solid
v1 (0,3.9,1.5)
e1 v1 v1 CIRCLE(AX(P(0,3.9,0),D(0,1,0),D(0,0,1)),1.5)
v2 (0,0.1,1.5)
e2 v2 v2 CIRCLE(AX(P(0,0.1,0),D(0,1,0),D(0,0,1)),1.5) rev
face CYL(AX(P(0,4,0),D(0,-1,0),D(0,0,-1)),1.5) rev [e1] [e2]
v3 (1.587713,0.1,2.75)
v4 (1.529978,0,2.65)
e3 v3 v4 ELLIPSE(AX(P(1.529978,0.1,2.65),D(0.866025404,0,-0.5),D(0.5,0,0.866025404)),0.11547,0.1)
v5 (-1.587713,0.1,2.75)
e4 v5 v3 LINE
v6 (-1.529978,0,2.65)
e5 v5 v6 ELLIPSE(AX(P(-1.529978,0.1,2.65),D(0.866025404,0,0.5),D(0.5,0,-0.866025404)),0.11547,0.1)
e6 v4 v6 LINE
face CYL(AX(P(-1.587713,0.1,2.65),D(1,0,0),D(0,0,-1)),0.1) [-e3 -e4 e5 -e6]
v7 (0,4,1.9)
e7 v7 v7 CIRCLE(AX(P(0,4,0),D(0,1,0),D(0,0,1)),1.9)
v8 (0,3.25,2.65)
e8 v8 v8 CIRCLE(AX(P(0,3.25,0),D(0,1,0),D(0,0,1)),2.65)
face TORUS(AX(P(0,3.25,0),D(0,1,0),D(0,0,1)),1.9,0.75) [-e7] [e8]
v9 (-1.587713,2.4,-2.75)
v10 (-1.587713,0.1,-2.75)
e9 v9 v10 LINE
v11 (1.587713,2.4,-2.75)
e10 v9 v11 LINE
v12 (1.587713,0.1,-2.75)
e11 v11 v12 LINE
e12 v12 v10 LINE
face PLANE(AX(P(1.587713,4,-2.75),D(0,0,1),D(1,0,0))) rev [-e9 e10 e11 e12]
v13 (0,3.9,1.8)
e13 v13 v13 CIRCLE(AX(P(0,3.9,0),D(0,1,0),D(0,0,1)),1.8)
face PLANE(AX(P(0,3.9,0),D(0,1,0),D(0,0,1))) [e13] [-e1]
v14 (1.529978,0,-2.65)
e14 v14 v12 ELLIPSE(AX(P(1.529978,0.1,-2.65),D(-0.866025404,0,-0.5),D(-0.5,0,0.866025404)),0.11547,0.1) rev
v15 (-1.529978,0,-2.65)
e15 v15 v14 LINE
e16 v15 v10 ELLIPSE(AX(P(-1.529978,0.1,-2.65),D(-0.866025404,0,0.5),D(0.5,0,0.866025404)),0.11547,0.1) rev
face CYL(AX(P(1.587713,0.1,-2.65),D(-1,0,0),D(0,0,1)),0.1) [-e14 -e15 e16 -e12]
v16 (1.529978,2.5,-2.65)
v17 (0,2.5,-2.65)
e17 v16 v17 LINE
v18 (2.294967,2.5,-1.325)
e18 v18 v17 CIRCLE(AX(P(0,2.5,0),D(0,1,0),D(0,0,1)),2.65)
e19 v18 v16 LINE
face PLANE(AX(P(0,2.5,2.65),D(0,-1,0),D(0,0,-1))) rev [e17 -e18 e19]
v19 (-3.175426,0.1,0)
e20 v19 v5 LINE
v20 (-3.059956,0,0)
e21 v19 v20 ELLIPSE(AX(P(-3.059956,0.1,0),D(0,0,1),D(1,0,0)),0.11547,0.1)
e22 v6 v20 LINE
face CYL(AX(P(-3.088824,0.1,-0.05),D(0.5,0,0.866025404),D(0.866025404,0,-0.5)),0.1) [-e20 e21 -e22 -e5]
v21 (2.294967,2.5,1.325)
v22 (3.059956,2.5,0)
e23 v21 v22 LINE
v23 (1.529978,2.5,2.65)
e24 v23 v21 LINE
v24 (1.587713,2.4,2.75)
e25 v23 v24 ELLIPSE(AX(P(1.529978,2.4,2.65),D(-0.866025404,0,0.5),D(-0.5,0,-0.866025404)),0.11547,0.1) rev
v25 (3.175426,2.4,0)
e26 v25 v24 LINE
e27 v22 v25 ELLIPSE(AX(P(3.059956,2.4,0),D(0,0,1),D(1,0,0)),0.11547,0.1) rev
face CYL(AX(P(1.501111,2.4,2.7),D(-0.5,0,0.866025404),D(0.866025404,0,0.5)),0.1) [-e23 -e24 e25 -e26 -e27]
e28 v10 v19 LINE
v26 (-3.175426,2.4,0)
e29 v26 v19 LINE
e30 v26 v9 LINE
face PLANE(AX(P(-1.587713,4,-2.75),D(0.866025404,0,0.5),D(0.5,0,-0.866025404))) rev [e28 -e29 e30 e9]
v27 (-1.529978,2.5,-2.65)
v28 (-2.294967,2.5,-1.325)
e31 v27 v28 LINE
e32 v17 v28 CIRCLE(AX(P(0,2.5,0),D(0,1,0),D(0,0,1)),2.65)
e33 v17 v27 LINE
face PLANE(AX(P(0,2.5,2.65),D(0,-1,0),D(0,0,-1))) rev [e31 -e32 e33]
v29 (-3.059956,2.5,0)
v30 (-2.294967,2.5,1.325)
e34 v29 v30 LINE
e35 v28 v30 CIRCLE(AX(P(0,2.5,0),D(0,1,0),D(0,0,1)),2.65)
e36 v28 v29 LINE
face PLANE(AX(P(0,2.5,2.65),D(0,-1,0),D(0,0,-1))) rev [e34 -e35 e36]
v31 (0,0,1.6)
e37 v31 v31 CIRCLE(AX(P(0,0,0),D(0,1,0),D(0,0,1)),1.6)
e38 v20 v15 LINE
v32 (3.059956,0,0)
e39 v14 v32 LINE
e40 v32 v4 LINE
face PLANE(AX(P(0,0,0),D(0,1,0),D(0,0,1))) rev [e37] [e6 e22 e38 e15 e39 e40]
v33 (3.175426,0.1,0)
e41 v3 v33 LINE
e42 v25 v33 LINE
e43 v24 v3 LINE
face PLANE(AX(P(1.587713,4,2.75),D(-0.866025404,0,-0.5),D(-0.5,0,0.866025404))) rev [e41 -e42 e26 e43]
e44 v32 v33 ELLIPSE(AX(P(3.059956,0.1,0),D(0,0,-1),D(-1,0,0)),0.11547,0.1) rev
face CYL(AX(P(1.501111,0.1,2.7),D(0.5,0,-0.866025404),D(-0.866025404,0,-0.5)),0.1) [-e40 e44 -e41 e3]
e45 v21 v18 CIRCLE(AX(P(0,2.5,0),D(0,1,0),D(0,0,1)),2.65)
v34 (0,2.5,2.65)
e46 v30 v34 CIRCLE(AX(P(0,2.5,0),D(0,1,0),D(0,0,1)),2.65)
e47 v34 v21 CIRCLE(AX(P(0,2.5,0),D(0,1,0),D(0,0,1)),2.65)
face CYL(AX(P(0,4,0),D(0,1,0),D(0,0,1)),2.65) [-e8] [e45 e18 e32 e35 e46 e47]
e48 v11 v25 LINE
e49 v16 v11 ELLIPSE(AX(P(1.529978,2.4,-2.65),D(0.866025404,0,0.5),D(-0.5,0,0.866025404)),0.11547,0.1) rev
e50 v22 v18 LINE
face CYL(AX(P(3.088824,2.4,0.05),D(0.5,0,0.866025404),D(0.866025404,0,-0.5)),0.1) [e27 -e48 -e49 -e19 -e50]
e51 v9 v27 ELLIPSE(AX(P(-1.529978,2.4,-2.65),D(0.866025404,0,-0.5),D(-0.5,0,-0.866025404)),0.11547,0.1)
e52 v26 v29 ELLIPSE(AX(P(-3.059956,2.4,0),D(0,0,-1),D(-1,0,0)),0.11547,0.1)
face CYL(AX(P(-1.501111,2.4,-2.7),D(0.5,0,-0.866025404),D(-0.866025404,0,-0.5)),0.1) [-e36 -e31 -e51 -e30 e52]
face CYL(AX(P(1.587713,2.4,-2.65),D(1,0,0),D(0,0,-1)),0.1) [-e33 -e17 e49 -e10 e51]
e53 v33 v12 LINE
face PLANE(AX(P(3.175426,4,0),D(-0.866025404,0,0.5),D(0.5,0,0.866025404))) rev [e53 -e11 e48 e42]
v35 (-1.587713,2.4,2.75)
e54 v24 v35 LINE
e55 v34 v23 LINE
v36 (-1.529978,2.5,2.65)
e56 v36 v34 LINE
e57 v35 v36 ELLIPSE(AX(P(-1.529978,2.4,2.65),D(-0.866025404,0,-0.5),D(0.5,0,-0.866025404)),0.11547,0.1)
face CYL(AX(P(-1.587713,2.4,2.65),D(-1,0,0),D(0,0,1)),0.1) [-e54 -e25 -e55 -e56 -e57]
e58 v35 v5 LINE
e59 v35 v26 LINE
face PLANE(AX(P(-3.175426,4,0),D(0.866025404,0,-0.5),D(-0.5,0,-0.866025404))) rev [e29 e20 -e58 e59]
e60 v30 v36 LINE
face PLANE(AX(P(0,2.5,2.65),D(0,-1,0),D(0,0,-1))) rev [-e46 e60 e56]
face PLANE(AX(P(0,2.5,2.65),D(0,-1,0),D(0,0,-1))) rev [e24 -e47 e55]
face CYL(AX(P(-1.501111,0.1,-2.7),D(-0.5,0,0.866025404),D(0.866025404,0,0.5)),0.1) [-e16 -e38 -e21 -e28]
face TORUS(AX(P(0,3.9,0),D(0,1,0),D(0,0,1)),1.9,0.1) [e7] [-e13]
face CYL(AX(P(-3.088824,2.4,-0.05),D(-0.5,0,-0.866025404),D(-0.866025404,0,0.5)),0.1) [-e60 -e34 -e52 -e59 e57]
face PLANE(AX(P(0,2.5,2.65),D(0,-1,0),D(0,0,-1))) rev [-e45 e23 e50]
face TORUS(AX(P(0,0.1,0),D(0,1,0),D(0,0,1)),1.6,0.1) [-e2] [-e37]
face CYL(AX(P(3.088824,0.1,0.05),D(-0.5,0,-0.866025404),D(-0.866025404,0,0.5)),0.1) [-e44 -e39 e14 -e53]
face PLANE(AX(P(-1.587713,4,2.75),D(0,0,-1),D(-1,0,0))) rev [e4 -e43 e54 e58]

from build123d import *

# Parameters (mm, degrees)
SKETCH1_R           = 1.5
BOSS_EXTRUDE1_DEPTH = 4
FILLET1_R           = 0.1
CUT_EXTRUDE1_START  = -0.1
SKETCH3_R           = 1.8
SKETCH3_R_2         = 1.5
CUT_EXTRUDE1_DEPTH  = 0.1
FILLET2_R           = 0.1


with BuildPart() as part:
    # Sketch1 → Boss-Extrude1 (new body)
    with BuildSketch(Plane(origin=(0, 0, 0), x_dir=(1, 0, 0), z_dir=(0, 1, 0))):
        Polygon((1.58771324, -2.75), (3.175426481, 0), (1.58771324, 2.75), (-1.58771324, 2.75), (-3.175426481, 0), (-1.58771324, -2.75), align=None)
        with Locations(Location((0, 0, 0), (0, 0, 270))):
            Circle(SKETCH1_R, mode=Mode.SUBTRACT)
    extrude(amount=BOSS_EXTRUDE1_DEPTH)

    # Sketch2 → Cut-Revolve3 (revolve, cut)
    with BuildSketch(Plane(origin=(0, 0, 0), x_dir=(0, 0, -1), z_dir=(1, 0, 0))):
        with BuildLine():
            Line((-2.65, 3.25), (-2.65, 2.5))
            Line((-2.65, 2.5), (-5.25, 2.5))
            Line((-5.25, 2.5), (-5.25, 4))
            Line((-5.25, 4), (-5.25, 4.1))
            Line((-5.25, 4.1), (-1.9, 4.1))
            Line((-1.9, 4.1), (-1.9, 4))
            ThreePointArc((-1.9, 4), (-2.430330086, 3.780330086), (-2.65, 3.25))
        make_face()
    revolve(axis=Axis((0, 4, 0), (0, -1, 0)), mode=Mode.SUBTRACT)

    # Fillet1
    fillet1_edges = [part.edges().sort_by_distance(p)[0] for p in [
        (0, 0, -1.5),
        (-2.38156986, 2.5, 1.375),
        (2.38156986, 2.5, 1.375),
        (0, 2.5, 2.75),
        (-2.38156986, 2.5, -1.375),
        (0, 2.5, -2.75),
        (2.38156986, 2.5, -1.375),
        (-2.38156986, 0, 1.375),
        (-2.38156986, 0, -1.375),
        (0, 0, -2.75),
        (2.38156986, 0, -1.375),
        (2.38156986, 0, 1.375),
        (0, 0, 2.75),
    ]]
    fillet(fillet1_edges, radius=FILLET1_R - 0.0001)  # a hair under: the kernel refuses the full size

    # Sketch3 → Cut-Extrude1 (cut)
    with BuildSketch(Plane(origin=(0, 4, 0), x_dir=(1, 0, 0), z_dir=(0, 1, 0)).offset(CUT_EXTRUDE1_START)):
        with Locations(Location((0, 0, 0), (0, 0, 270))):
            Circle(SKETCH3_R)
        with Locations(Location((0, 0, 0), (0, 0, 270))):
            Circle(SKETCH3_R_2, mode=Mode.SUBTRACT)
    extrude(amount=CUT_EXTRUDE1_DEPTH, mode=Mode.SUBTRACT)

    # Fillet2
    fillet2_edges = [part.edges().sort_by_distance(p)[0] for p in [
        (0, 4, -1.8),
    ]]
    fillet(fillet2_edges, radius=FILLET2_R - 0.0001)  # a hair under: the kernel refuses the full size


solid = part.part
